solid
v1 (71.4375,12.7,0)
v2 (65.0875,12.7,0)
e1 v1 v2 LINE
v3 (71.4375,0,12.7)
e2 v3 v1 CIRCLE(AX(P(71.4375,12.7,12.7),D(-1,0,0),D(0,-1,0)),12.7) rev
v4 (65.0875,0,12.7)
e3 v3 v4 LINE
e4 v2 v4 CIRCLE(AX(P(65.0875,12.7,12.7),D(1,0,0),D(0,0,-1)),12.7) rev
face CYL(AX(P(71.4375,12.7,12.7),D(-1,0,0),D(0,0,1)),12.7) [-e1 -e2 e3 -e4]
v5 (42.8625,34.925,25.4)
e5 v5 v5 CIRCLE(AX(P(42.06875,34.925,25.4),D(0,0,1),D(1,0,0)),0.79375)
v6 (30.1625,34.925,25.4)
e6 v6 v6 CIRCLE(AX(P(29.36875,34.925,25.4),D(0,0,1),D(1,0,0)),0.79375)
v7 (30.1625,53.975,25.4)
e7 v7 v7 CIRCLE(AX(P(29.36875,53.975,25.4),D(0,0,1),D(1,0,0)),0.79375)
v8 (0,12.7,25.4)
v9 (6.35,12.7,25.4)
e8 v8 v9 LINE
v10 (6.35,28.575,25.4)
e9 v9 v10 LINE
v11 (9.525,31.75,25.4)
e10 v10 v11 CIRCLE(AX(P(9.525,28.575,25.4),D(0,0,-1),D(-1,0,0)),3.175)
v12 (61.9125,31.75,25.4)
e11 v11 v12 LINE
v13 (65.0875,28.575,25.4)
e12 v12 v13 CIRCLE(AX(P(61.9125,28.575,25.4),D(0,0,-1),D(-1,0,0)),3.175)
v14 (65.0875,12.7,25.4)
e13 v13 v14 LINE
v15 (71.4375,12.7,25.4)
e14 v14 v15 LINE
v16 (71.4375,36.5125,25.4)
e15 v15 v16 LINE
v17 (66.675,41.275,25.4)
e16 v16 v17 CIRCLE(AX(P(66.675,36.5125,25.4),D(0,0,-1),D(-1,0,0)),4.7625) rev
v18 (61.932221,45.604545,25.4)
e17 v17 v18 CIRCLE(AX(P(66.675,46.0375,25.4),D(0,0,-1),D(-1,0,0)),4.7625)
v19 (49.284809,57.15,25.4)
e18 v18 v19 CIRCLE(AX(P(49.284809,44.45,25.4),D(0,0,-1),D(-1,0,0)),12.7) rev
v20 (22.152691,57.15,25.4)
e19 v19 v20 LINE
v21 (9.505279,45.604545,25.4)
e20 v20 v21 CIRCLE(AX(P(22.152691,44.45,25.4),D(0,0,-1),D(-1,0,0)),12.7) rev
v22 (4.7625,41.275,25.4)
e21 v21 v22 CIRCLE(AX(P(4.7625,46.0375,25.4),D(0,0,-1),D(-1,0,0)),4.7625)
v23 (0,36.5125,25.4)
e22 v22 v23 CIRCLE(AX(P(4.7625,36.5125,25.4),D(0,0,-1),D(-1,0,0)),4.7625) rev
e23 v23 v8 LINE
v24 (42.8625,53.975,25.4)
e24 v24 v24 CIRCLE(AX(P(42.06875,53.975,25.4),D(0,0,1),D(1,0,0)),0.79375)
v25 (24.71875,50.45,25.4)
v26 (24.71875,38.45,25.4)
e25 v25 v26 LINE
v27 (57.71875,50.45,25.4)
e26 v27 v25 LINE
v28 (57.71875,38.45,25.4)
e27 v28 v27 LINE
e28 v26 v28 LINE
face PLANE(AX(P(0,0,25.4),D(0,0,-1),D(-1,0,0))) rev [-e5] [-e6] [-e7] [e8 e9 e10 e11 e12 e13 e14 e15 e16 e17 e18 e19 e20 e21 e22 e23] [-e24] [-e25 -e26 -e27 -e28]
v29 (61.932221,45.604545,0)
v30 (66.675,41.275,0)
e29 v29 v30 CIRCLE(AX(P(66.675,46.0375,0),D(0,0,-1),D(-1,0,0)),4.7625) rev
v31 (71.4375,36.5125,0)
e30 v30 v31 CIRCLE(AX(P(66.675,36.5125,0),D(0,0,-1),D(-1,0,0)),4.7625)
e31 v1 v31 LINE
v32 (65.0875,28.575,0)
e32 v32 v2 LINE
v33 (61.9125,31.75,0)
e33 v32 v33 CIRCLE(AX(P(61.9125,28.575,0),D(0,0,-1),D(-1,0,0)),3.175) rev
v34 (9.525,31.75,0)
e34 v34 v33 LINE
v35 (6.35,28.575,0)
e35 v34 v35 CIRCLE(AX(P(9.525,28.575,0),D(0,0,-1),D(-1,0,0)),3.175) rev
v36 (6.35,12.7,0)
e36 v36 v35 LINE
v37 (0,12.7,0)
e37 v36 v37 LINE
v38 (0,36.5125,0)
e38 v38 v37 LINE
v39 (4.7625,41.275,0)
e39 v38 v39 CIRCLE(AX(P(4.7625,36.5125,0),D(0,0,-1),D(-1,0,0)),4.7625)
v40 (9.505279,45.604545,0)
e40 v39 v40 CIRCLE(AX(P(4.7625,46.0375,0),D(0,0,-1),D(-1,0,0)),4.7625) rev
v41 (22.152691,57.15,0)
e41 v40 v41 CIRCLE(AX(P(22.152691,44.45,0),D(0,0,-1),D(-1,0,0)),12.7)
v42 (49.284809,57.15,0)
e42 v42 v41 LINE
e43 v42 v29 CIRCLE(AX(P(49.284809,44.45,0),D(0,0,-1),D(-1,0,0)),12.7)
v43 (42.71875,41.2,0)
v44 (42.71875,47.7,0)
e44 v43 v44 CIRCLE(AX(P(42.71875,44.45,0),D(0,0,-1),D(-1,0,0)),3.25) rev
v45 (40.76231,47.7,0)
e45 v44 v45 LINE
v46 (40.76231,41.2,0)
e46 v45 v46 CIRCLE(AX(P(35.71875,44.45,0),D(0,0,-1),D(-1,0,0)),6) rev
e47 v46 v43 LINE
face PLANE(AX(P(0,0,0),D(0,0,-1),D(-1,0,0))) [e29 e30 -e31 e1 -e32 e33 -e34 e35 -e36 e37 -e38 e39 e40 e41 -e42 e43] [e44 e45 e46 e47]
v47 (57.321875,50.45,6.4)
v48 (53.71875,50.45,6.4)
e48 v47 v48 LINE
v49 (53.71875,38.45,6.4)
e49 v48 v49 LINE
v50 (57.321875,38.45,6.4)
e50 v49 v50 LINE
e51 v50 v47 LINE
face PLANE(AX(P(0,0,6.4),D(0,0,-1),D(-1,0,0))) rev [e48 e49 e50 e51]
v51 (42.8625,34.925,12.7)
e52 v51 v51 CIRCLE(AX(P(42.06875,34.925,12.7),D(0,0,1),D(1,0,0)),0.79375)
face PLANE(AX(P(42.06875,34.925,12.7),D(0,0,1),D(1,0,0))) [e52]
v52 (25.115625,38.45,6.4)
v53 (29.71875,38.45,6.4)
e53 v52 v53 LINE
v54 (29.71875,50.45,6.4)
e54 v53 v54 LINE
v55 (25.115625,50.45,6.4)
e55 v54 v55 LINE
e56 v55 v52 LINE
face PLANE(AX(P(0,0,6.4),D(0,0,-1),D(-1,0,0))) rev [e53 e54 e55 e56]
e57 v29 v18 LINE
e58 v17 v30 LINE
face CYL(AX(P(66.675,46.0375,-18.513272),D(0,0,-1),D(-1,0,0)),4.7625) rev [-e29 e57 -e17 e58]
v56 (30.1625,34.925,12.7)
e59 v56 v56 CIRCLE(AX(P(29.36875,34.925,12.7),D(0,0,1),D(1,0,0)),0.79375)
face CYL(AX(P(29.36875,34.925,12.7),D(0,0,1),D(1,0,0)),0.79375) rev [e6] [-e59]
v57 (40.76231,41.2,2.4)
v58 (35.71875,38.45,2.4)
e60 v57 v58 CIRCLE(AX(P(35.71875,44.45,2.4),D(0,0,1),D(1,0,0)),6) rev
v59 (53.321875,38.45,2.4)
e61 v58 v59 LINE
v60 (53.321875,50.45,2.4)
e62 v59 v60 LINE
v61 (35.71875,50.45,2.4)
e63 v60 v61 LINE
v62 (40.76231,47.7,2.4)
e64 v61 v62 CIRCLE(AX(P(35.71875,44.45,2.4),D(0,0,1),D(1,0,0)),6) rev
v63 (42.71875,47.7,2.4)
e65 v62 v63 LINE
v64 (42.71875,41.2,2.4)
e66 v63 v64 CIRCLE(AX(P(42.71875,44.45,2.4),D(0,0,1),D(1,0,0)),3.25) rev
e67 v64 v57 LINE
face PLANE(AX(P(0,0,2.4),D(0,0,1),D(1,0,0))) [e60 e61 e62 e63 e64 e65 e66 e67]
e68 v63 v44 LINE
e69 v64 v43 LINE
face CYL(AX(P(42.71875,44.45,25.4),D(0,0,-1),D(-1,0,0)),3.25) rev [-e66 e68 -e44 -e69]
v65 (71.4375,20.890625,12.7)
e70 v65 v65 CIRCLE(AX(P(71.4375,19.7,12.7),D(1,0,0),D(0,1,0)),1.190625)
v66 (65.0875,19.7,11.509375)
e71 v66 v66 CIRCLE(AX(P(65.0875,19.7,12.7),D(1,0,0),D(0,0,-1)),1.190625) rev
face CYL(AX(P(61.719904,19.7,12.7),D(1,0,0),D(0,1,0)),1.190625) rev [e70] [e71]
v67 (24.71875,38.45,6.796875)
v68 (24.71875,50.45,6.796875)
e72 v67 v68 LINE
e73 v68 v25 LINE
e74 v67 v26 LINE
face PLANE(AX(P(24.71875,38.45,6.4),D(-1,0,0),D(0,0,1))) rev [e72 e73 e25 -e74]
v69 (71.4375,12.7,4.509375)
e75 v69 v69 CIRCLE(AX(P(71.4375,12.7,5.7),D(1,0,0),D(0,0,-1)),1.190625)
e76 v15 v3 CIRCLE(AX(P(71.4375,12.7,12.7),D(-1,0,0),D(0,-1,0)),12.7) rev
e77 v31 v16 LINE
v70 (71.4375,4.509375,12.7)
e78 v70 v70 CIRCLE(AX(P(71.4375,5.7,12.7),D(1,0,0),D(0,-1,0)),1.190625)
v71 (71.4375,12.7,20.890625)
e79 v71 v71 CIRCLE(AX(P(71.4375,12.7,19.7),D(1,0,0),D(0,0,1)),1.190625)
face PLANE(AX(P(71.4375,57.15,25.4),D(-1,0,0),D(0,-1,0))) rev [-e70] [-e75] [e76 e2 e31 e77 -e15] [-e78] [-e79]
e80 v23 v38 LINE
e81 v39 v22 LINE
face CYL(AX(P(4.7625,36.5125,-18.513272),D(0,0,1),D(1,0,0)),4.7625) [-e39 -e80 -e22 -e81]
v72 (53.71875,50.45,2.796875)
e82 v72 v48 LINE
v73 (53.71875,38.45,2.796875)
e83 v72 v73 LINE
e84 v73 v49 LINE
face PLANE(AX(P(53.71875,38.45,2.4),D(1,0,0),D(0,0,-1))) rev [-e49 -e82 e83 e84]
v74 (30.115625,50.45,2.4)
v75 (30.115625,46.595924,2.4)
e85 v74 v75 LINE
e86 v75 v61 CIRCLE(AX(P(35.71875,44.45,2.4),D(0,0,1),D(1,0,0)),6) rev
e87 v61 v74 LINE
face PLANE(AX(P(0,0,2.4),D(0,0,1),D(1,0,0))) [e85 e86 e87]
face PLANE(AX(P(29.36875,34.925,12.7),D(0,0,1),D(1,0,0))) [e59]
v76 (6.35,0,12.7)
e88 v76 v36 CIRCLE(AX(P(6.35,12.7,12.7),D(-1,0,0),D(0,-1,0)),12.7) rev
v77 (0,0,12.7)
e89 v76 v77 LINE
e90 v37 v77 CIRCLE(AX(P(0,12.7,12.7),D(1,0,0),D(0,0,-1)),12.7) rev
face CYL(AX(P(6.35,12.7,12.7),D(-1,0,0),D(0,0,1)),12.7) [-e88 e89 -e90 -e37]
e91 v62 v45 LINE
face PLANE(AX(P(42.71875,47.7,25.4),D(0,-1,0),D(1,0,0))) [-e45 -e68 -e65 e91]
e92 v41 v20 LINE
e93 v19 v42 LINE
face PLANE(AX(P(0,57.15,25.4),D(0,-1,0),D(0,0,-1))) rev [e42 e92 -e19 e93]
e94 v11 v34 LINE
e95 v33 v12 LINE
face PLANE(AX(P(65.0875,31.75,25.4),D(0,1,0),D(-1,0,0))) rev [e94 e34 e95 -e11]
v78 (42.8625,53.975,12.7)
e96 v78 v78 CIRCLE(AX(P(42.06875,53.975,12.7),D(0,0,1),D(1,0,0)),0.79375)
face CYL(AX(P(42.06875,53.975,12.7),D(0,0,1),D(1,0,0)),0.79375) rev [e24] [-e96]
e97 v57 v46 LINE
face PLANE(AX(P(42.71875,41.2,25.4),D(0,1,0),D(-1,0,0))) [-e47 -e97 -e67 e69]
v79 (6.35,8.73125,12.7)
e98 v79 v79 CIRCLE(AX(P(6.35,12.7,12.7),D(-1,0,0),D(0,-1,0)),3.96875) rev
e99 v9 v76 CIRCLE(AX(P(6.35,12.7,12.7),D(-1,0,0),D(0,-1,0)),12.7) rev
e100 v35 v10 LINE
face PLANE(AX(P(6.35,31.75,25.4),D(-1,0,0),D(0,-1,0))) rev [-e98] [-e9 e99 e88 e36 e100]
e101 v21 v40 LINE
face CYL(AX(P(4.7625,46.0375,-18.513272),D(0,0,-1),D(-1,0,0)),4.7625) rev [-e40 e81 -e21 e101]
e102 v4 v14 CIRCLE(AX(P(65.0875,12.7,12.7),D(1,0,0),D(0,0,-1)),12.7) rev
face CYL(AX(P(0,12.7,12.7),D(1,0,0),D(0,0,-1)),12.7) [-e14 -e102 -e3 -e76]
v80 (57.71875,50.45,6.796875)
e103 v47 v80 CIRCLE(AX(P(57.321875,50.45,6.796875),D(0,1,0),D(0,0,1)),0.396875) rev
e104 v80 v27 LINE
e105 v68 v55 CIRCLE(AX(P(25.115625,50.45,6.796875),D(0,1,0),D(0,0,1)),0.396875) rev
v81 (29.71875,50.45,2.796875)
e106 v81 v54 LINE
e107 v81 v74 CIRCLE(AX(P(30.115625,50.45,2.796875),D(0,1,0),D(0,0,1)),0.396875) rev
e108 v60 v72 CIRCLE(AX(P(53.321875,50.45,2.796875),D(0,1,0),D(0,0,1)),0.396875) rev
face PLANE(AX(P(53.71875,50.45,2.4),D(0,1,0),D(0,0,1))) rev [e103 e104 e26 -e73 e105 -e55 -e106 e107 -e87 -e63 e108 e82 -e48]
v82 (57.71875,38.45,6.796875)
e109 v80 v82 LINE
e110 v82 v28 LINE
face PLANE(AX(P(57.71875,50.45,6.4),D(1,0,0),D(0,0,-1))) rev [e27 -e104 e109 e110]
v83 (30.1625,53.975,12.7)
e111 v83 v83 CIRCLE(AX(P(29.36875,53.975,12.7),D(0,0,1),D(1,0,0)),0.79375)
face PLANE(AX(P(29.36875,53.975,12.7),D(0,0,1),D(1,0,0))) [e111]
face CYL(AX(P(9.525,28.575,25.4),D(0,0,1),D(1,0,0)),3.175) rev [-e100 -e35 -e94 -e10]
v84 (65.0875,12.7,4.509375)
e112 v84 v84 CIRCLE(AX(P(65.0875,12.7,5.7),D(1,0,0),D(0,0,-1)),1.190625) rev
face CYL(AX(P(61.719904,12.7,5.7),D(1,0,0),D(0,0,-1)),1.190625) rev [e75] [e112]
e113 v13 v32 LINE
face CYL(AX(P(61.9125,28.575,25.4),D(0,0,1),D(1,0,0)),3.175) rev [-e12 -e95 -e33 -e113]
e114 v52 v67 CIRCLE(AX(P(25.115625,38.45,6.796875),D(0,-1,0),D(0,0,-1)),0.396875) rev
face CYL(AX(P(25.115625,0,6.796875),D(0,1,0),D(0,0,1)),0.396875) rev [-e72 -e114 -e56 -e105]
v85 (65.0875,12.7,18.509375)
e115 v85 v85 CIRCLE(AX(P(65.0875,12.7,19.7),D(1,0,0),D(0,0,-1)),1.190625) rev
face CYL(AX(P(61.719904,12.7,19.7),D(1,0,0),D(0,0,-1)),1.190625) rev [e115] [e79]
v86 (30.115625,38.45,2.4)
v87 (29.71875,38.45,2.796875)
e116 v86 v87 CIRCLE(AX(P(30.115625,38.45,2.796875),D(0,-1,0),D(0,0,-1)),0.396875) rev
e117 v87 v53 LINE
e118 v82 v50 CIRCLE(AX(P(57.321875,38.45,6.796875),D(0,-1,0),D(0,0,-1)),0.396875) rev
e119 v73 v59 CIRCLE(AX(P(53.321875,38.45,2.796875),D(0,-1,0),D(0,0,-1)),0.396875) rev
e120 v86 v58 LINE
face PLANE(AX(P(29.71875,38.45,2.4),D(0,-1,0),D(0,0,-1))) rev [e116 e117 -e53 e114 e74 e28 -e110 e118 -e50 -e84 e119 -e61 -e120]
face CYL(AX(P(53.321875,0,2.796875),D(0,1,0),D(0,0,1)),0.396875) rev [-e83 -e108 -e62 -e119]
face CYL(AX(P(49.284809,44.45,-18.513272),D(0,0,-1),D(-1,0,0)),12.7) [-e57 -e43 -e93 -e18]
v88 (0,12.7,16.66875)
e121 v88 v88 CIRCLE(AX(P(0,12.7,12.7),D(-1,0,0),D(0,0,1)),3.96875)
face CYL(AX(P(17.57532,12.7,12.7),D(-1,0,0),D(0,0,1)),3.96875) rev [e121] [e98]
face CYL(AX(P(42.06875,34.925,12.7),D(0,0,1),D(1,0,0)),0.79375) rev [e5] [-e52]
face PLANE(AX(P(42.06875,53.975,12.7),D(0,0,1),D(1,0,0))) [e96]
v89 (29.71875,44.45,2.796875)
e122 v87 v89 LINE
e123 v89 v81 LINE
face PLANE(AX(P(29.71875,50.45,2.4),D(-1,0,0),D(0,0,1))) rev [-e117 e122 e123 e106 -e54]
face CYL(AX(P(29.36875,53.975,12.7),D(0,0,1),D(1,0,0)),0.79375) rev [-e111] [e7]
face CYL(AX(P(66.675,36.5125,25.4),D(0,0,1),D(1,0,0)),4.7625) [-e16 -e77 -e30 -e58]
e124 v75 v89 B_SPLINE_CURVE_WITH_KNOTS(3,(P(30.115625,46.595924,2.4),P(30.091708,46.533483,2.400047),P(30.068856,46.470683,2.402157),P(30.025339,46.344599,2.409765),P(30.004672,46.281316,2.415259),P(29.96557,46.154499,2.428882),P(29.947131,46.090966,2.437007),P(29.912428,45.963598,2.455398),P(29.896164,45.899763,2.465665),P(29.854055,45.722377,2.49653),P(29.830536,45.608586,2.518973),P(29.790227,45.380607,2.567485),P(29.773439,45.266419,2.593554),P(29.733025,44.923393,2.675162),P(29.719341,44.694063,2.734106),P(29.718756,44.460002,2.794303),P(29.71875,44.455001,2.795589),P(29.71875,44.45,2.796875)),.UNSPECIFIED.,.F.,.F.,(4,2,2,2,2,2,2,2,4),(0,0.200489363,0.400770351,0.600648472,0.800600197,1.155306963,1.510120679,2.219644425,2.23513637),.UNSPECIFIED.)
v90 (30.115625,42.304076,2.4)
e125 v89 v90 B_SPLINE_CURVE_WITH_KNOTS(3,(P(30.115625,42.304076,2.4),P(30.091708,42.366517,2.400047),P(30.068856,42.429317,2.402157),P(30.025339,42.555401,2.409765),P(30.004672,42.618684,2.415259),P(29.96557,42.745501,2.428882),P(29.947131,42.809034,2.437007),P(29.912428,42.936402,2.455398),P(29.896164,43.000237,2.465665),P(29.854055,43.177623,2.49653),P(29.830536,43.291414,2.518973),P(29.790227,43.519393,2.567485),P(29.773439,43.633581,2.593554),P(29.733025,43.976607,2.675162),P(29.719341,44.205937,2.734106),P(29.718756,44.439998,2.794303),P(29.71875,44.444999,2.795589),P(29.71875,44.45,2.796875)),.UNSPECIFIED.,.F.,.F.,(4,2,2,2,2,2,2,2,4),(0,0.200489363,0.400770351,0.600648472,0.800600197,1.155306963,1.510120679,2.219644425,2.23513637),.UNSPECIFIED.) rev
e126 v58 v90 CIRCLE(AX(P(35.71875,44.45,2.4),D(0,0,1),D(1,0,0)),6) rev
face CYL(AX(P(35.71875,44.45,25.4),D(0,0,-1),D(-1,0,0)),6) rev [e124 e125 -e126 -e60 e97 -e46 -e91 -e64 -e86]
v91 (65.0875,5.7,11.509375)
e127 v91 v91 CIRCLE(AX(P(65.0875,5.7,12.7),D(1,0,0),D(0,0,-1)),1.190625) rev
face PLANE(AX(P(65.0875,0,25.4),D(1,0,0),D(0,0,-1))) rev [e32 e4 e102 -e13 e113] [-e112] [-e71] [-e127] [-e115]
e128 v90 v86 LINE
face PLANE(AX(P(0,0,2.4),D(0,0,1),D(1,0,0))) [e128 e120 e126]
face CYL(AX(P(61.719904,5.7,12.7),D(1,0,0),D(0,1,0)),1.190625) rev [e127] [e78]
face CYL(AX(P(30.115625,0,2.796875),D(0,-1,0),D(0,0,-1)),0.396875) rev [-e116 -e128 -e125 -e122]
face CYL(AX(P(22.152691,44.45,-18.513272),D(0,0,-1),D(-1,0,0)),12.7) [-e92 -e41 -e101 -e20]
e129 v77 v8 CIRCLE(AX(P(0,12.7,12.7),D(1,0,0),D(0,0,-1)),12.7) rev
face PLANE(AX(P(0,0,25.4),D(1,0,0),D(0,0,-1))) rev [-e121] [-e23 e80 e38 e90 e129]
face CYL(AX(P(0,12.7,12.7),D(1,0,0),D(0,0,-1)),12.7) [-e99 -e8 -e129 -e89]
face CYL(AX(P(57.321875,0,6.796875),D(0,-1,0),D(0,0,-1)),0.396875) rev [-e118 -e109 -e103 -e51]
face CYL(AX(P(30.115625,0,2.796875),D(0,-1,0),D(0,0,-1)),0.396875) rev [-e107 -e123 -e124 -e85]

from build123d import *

# Parameters (mm, degrees)
BOSS_EXTRUDE1_DEPTH     = 25.4
FILLET1_R               = 3.175
FILLET2_R               = 12.7
SKETCH3_R               = 1.190625
CUT_EXTRUDE1_DEPTH      = 6.35
CIRPATTERN1_COUNT       = 4
SKETCH4_R               = 3.96875
CUT_EXTRUDE2_DEPTH      = 6.35
SKETCH5_R               = 3.175
CUT_EXTRUDE3_DEPTH      = 25.4
SKETCH6_W               = 24
SKETCH6_H               = 12
CUT_EXTRUDE4_DEPTH      = 23
SKETCH7_W               = 5
SKETCH7_H               = 12
SKETCH7_W_2             = 4
CUT_EXTRUDE5_DEPTH      = 19
FILLET6_R               = 0.396875
CUT_EXTRUDE6_DEPTH      = 95.331537177
CUT_EXTRUDE6_DEPTH_BACK = 4
SKETCH9_W               = 9.525
SKETCH9_H               = 15.875
CUT_EXTRUDE7_DEPTH      = 25.4
FILLET7_DEPTH           = 25.4
FILLET7_2_DEPTH         = 25.4
FILLET8_R               = 12.7
SKETCH10_R              = 0.79375
CUT_EXTRUDE8_DEPTH      = 12.7


with BuildPart() as part:
    # Sketch2 → Boss-Extrude1 (new body)
    with BuildSketch(Plane.XY):
        Polygon((0, 0), (0, 57.15), (71.4375, 57.15), (71.4375, 0), (65.0875, 0), (65.0875, 31.75), (6.35, 31.75), (6.35, 0), align=None)
    extrude(amount=BOSS_EXTRUDE1_DEPTH)

    # Fillet1
    fillet1_edges = [part.edges().sort_by_distance(p)[0] for p in [
        (65.0875, 31.75, 12.7),
        (6.35, 31.75, 12.7),
    ]]
    fillet(fillet1_edges, radius=FILLET1_R)

    # Fillet2
    fillet2_edges = [part.edges().sort_by_distance(p)[0] for p in [
        (3.175, 0, 0),
        (68.2625, 0, 0),
        (3.175, 0, 25.4),
        (68.2625, 0, 25.4),
    ]]
    fillet(fillet2_edges, radius=FILLET2_R - 0.0001)  # a hair under: the kernel refuses the full size

    # Sketch3 → Cut-Extrude1 (cut)
    with BuildSketch(Plane(origin=(71.4375, 0, 0), x_dir=(0, 0, -1), z_dir=(1, 0, 0))):
        with Locations(Location((-12.7, 19.7, 0), (0, 0, 90))):
            Circle(SKETCH3_R)
    cut_extrude1 = extrude(amount=-CUT_EXTRUDE1_DEPTH, mode=Mode.SUBTRACT)

    # CirPattern1: Cut-Extrude1 ×4 about axis
    cirpattern1_axis = Axis((0, 12.7, 12.7), (1, 0, 0))
    for i in range(1, CIRPATTERN1_COUNT):
        add(cut_extrude1.rotate(cirpattern1_axis, i * 360 / CIRPATTERN1_COUNT), mode=Mode.SUBTRACT)

    # Sketch4 → Cut-Extrude2 (cut)
    with BuildSketch(Plane.ZY):
        with Locations((12.7, 12.7)):
            Circle(SKETCH4_R)
    extrude(amount=-CUT_EXTRUDE2_DEPTH, mode=Mode.SUBTRACT)

    # Sketch5 → Cut-Extrude3 (cut)
    with BuildSketch(Plane.XY.offset(25.4)):
        with Locations((35.71875, 44.45)):
            Circle(SKETCH5_R)
    extrude(amount=-CUT_EXTRUDE3_DEPTH, mode=Mode.SUBTRACT)

    # Sketch6 → Cut-Extrude4 (cut)
    with BuildSketch(Plane.XY.offset(25.4)):
        with Locations((41.71875, 44.45)):
            Rectangle(SKETCH6_W, SKETCH6_H)
    extrude(amount=-CUT_EXTRUDE4_DEPTH, mode=Mode.SUBTRACT)

    # Sketch7 → Cut-Extrude5 (cut)
    with BuildSketch(Plane.XY.offset(25.4)):
        with Locations((27.21875, 44.45)):
            Rectangle(SKETCH7_W, SKETCH7_H)
        with Locations((55.71875, 44.45)):
            Rectangle(SKETCH7_W_2, SKETCH7_H)
    extrude(amount=-CUT_EXTRUDE5_DEPTH, mode=Mode.SUBTRACT)

    # Fillet6
    fillet6_edges = [part.edges().sort_by_distance(p)[0] for p in [
        (24.71875, 44.45, 6.4),
        (57.71875, 44.45, 6.4),
        (53.71875, 44.45, 2.4),
        (29.71875, 44.45, 2.4),
    ]]
    fillet(fillet6_edges, radius=FILLET6_R)

    # Sketch8 → Cut-Extrude6 (cut, two sides: drawn at the far end of the back side and taken through both)
    with BuildSketch(Plane.XY.offset(2.4).offset(-CUT_EXTRUDE6_DEPTH_BACK)):
        with BuildLine():
            Line((42.71875, 47.7), (40.76231025, 47.7))
            ThreePointArc((40.76231025, 47.7), (29.71875, 44.45), (40.76231025, 41.2))
            Line((40.76231025, 41.2), (42.71875, 41.2))
            ThreePointArc((42.71875, 41.2), (45.96875, 44.45), (42.71875, 47.7))
        make_face()
    extrude(amount=CUT_EXTRUDE6_DEPTH + CUT_EXTRUDE6_DEPTH_BACK, mode=Mode.SUBTRACT)

    # Sketch9 → Cut-Extrude7 (cut)
    with BuildSketch(Plane.XY.offset(25.4)):
        with Locations((4.7625, 49.2125)):
            Rectangle(SKETCH9_W, SKETCH9_H)
        with Locations((66.675, 49.2125)):
            Rectangle(SKETCH9_W, SKETCH9_H)
    extrude(amount=-CUT_EXTRUDE7_DEPTH, mode=Mode.SUBTRACT)

    # Fillet7: read off the stored shape, not the designer's step
    # Fillet7 outline → Fillet7 (cut)
    with BuildSketch(Plane.XY):
        with BuildLine():
            ThreePointArc((66.675, 41.275), (70.042596045, 39.880096045), (71.4375, 36.5125))
            Line((71.4375, 36.5125), (71.4375, 41.275))
            Line((71.4375, 41.275), (66.675, 41.275))
        make_face()
        with BuildLine():
            ThreePointArc((0, 36.5125), (1.394903955, 39.880096045), (4.7625, 41.275))
            Line((4.7625, 41.275), (0, 41.275))
            Line((0, 41.275), (0, 36.5125))
        make_face()
    extrude(amount=FILLET7_DEPTH, mode=Mode.SUBTRACT)

    # Fillet7 2 outline → Fillet7 2 (add)
    with BuildSketch(Plane.XY):
        with BuildLine():
            Line((61.9125, 41.275), (66.675, 41.275))
            ThreePointArc((66.675, 41.275), (63.307403955, 42.669903955), (61.9125, 46.0375))
            Line((61.9125, 46.0375), (61.9125, 41.275))
        make_face()
        with BuildLine():
            ThreePointArc((9.525, 46.0375), (8.130096045, 42.669903955), (4.7625, 41.275))
            Line((4.7625, 41.275), (9.525, 41.275))
            Line((9.525, 41.275), (9.525, 46.0375))
        make_face()
    extrude(amount=FILLET7_2_DEPTH)

    # Fillet8
    fillet8_edges = [part.edges().sort_by_distance(p)[0] for p in [
        (9.525, 57.15, 12.7),
        (61.9125, 57.15, 12.7),
    ]]
    fillet(fillet8_edges, radius=FILLET8_R)

    # Sketch10 → Cut-Extrude8 (cut)
    with BuildSketch(Plane.XY.offset(25.4)):
        with Locations((29.36875, 53.975)):
            Circle(SKETCH10_R)
        with Locations((42.06875, 53.975)):
            Circle(SKETCH10_R)
        with Locations((29.36875, 34.925)):
            Circle(SKETCH10_R)
        with Locations((42.06875, 34.925)):
            Circle(SKETCH10_R)
    extrude(amount=-CUT_EXTRUDE8_DEPTH, mode=Mode.SUBTRACT)


solid = part.part
